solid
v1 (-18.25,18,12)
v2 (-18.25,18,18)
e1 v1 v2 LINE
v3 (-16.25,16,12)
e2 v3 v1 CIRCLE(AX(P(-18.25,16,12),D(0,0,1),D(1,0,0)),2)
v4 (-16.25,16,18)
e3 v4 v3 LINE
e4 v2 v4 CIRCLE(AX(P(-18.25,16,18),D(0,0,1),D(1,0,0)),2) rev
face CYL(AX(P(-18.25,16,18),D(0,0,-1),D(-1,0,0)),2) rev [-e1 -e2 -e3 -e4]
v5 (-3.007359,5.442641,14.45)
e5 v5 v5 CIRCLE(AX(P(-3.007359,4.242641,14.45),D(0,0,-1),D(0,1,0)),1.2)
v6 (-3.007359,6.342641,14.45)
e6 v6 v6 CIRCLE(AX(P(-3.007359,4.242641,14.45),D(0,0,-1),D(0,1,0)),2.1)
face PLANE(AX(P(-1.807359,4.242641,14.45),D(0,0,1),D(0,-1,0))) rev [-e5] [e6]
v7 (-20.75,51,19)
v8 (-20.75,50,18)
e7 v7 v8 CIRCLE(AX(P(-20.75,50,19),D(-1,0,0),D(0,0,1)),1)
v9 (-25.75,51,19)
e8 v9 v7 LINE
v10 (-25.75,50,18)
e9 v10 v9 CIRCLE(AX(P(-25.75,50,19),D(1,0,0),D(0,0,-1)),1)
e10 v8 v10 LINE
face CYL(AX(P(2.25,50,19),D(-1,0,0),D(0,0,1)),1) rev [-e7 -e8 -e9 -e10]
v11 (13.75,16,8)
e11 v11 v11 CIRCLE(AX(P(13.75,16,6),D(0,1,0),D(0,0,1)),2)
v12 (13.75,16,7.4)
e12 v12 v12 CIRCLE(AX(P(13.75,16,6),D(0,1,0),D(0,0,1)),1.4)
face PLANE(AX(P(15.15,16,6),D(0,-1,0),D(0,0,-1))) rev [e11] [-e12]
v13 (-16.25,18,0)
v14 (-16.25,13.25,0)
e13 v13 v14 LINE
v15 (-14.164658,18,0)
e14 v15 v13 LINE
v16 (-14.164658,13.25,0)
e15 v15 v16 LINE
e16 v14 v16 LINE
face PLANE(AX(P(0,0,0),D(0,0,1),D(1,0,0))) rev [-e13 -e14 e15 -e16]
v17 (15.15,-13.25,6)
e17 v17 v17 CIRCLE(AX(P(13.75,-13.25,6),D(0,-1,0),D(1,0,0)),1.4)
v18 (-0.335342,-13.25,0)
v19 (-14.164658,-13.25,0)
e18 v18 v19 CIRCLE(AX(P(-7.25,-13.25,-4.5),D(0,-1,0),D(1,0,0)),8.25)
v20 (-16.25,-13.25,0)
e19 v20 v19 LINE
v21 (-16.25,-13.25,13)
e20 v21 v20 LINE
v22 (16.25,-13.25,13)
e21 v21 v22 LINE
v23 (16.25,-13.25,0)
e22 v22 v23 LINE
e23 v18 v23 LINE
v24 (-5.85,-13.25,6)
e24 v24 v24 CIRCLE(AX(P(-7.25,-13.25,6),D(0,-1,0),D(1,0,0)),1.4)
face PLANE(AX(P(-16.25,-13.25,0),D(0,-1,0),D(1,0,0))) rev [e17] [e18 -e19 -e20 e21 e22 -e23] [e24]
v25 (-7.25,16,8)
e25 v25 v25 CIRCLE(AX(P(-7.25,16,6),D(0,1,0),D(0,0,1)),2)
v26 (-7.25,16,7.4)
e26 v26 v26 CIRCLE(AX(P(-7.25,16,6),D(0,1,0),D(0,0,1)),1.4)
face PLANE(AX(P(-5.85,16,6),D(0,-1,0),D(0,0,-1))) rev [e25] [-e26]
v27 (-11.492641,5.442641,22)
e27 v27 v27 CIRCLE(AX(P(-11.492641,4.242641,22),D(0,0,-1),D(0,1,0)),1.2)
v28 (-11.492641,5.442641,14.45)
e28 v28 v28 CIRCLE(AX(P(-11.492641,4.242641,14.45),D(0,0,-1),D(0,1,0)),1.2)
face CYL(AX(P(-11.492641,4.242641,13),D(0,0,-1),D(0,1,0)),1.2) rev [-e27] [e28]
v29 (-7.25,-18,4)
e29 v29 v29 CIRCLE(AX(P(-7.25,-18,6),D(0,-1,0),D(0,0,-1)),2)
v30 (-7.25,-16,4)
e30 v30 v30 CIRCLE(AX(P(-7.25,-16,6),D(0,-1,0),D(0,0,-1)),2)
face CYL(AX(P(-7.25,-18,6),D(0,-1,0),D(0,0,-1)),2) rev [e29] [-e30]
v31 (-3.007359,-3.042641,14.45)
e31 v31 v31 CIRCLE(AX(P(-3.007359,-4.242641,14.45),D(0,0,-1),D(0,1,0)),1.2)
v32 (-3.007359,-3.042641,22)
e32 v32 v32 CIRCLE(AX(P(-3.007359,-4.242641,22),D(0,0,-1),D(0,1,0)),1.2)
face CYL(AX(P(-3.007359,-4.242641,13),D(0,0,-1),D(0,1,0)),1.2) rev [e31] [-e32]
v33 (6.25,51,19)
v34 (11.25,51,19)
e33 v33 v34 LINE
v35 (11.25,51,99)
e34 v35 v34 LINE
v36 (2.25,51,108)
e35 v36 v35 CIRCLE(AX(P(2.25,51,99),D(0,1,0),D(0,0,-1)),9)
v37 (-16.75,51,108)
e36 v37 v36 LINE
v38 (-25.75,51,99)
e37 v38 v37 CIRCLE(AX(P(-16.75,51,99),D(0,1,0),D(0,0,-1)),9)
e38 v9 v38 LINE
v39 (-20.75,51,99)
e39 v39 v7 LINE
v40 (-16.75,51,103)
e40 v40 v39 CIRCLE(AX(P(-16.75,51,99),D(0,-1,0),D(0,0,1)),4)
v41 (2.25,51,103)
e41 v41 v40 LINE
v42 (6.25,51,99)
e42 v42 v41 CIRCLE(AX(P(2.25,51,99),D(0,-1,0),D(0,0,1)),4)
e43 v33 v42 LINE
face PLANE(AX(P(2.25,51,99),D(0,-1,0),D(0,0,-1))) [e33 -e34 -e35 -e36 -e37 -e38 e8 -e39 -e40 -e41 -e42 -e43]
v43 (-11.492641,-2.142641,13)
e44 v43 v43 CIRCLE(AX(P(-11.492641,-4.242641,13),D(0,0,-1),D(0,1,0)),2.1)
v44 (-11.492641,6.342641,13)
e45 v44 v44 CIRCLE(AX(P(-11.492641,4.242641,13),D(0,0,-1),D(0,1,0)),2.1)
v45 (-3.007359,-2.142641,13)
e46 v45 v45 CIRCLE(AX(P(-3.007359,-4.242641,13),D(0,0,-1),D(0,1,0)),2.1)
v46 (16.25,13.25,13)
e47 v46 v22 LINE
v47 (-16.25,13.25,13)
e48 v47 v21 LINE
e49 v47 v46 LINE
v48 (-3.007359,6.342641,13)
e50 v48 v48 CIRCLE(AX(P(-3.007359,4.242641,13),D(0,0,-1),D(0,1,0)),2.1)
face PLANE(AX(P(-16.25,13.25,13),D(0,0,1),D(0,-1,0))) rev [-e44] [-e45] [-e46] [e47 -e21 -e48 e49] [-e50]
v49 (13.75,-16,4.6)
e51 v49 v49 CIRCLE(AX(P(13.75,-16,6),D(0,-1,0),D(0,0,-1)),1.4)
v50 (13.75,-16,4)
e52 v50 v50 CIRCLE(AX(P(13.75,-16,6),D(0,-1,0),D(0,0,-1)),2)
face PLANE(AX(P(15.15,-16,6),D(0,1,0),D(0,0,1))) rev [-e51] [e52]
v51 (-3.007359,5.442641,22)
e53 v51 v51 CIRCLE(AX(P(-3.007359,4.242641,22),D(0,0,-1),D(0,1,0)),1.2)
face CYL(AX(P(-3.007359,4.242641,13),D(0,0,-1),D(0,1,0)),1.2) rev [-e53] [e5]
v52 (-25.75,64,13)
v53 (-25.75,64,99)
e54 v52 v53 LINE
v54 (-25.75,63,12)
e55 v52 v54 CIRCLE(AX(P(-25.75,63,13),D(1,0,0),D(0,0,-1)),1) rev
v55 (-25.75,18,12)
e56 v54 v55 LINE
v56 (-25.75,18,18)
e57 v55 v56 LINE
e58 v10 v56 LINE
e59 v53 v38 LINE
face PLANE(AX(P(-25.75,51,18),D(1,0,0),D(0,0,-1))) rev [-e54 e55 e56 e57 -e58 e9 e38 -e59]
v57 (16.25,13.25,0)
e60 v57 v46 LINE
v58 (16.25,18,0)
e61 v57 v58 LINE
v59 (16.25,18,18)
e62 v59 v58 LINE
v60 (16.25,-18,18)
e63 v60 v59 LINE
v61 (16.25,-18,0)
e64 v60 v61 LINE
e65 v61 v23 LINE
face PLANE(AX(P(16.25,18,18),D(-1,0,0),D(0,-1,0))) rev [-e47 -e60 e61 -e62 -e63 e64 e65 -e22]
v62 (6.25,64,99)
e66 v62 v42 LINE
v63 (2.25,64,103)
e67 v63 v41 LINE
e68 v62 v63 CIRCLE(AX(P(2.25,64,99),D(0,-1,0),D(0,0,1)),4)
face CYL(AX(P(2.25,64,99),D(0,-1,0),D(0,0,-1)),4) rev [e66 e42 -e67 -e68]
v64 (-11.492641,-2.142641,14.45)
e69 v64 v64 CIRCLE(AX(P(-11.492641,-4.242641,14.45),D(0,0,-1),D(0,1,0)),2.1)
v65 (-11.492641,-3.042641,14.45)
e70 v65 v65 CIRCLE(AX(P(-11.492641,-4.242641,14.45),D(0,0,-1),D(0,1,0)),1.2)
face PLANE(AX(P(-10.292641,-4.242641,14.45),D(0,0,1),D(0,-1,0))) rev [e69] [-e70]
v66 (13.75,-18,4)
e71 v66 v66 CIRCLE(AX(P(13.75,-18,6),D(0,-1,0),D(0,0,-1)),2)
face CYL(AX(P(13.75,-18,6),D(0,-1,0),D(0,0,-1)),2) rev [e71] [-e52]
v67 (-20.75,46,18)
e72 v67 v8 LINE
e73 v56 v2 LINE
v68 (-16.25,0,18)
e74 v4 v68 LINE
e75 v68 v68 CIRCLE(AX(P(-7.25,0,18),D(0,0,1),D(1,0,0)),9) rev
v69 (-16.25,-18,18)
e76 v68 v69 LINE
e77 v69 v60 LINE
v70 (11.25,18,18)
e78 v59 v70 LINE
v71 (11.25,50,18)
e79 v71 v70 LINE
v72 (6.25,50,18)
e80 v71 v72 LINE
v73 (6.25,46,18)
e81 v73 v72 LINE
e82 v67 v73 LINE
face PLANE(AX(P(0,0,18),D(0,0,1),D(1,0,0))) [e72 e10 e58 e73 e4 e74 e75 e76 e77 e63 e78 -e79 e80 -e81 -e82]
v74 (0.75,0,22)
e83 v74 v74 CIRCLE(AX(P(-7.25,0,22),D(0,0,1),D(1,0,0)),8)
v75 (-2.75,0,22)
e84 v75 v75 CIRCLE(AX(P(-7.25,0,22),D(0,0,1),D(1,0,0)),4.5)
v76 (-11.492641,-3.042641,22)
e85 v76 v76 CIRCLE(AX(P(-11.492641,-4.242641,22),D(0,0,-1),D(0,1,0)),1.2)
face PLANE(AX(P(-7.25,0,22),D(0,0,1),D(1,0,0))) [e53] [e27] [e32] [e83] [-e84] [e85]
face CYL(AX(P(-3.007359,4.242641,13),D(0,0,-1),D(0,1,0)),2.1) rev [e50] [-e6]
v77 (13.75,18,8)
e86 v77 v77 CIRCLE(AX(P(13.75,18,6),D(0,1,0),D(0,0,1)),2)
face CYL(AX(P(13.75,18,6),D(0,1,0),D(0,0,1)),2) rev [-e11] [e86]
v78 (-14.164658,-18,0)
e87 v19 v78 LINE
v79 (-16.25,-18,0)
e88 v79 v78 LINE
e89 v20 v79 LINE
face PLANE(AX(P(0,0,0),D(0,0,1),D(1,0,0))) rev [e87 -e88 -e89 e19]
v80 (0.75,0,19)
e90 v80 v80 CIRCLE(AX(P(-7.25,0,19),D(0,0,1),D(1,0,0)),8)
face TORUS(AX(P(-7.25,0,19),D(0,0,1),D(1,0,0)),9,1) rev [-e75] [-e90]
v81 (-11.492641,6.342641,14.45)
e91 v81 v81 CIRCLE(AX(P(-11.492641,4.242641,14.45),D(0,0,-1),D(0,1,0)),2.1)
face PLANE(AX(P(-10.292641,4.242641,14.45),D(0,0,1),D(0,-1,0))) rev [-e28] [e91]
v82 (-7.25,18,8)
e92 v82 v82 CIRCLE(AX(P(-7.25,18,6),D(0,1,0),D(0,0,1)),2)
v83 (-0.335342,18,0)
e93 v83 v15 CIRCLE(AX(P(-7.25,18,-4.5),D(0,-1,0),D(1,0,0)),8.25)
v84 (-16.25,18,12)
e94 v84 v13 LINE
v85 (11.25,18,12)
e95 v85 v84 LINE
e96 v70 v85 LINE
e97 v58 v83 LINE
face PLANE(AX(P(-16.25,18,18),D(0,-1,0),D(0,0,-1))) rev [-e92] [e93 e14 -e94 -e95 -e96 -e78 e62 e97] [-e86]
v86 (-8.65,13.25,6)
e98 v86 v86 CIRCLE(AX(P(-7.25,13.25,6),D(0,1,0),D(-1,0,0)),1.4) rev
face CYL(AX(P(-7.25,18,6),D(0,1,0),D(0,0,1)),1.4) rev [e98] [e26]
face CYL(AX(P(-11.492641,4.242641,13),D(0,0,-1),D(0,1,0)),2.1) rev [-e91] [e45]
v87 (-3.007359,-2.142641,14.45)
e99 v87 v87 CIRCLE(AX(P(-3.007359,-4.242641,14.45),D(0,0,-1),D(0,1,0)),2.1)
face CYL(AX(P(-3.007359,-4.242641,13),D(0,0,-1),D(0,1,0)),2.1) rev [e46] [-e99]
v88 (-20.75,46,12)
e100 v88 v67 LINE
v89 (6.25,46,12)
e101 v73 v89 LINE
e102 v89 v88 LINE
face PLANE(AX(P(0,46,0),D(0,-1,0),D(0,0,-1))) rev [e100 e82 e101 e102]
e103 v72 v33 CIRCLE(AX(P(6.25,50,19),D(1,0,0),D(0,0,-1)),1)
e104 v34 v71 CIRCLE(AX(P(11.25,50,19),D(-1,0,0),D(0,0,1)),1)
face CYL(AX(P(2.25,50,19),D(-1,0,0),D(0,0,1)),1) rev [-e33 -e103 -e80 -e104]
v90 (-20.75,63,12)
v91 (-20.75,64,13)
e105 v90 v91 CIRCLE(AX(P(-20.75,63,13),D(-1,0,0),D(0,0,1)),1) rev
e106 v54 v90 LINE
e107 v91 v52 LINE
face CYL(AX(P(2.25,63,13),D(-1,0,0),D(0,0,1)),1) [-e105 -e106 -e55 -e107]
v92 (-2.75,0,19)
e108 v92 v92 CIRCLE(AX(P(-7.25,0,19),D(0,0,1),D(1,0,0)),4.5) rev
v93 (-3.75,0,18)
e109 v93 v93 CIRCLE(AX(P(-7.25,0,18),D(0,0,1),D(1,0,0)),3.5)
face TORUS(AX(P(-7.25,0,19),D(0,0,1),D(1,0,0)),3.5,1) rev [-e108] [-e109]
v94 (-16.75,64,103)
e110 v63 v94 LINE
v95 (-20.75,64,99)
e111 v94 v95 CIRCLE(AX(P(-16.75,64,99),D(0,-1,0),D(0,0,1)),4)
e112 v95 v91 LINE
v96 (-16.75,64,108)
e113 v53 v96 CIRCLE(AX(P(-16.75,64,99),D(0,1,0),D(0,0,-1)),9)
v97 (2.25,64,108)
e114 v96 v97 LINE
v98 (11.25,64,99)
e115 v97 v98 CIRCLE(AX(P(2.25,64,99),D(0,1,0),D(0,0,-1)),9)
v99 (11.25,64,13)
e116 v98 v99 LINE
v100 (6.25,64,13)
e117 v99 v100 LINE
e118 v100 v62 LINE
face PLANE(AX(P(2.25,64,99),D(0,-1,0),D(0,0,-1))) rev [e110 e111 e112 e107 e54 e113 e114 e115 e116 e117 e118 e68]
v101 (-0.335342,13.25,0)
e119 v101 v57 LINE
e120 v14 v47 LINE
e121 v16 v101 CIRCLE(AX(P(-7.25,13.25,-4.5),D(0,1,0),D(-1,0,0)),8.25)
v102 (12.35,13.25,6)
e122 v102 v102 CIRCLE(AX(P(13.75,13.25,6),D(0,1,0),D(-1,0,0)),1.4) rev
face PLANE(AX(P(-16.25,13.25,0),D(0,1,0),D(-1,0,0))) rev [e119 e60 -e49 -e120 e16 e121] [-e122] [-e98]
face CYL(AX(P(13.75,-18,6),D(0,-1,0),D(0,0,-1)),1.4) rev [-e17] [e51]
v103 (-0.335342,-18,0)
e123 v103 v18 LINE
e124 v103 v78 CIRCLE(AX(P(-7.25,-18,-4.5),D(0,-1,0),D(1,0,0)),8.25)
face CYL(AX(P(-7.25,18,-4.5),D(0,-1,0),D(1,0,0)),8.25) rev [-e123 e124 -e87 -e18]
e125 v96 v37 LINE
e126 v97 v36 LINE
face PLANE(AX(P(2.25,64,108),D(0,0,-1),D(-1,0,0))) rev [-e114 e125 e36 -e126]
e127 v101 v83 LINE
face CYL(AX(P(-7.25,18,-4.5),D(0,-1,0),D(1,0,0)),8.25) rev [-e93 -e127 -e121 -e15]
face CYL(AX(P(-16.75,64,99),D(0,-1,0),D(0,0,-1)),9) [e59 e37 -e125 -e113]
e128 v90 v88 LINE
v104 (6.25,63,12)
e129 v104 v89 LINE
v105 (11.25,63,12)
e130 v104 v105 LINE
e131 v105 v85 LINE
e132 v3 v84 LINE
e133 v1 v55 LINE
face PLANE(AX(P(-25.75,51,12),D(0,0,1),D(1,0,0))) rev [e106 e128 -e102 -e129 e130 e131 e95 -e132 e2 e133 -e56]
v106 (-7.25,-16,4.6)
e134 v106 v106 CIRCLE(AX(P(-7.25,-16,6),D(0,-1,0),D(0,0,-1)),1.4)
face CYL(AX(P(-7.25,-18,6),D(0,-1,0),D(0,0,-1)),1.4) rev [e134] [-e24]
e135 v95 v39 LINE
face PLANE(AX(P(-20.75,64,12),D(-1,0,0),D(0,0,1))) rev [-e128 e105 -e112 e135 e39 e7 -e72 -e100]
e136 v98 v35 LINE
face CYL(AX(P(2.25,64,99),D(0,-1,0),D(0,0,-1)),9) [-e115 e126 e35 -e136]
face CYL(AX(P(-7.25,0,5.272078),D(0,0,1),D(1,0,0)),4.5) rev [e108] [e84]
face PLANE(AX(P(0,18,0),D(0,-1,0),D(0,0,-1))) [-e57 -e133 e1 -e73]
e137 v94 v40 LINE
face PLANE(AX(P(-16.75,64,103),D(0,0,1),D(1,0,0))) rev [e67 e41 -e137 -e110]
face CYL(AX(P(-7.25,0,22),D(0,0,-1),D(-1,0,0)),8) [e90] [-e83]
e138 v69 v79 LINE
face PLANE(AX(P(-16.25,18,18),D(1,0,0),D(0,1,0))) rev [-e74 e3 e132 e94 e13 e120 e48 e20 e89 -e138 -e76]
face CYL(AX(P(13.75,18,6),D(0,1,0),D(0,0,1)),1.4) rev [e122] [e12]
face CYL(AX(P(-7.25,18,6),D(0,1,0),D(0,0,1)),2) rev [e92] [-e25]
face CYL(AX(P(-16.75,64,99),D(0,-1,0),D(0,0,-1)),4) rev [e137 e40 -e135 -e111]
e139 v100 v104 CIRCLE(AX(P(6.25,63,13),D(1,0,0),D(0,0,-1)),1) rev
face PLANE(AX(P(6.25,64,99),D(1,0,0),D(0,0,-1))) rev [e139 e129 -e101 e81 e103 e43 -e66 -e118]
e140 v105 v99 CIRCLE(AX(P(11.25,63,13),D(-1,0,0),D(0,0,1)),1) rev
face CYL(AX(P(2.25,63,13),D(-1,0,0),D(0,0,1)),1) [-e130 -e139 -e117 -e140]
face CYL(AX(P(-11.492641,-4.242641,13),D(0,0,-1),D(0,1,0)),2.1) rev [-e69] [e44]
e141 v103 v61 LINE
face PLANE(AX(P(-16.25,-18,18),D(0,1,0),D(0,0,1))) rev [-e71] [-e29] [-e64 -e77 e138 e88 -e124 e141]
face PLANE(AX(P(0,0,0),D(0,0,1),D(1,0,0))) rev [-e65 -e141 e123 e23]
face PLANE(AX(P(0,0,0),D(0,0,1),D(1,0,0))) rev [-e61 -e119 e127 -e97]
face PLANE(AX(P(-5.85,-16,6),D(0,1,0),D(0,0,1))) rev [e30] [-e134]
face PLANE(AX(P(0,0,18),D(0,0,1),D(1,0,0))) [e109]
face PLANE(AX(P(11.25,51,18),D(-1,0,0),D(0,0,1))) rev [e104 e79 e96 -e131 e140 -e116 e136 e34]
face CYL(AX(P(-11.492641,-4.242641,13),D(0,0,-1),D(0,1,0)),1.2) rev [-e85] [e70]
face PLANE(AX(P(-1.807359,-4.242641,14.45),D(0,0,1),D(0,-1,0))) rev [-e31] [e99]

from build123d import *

# Parameters (mm, degrees)
SKETCH_1_W                   = 32.5
SKETCH_1_H                   = 36
EXTRUDE_1_DEPTH              = 18
SKETCH_2_W                   = 13
SKETCH_2_H                   = 26.5
CUT_EXTRUDE_1_DEPTH          = 42.282562905
HOLE_WIZARD_M2_3_AT_2_COUNT  = 2
HOLE_WIZARD_M2_3_AT_2_PITCH  = 21
CUT_EXTRUDE_3_DEPTH          = 40.555340979
CUT_EXTRUDE_3_DEPTH_BACK     = 40.555340979
SKETCH_4_R                   = 8.25
SKETCH_4_R_2                 = 1.2
SKETCH_18_R                  = 8
EXTRUDE_4_DEPTH              = 4
HOLE_WIZARD_M2_2_D           = 2.4
HOLE_WIZARD_M2_2_CBORE_D     = 4.2
HOLE_WIZARD_M2_2_CBORE_DEPTH = 1.45
SKETCH_19_R                  = 4.5
CUT_EXTRUDE_9_DEPTH          = 4
SKETCH_13_W                  = 37
SKETCH_13_H                  = 6
EXTRUDE_3_DEPTH              = 33
EXTRUDE_5_DEPTH              = 13
FILLET_1_R                   = 1
FILLET_2_R                   = 1
FILLET_3_R                   = 2
FILLET_4_R                   = 1
SKETCH_21_W                  = 27
SKETCH_21_H                  = 6
CUT_EXTRUDE_10_DEPTH         = 5


with BuildPart() as part:
    # ｽｹｯﾁ1 → ﾎﾞｽ - 押し出し1 (new body)
    with BuildSketch(Plane.XY):
        Rectangle(SKETCH_1_W, SKETCH_1_H)
    extrude(amount=EXTRUDE_1_DEPTH)

    # ｽｹｯﾁ2 → ｶｯﾄ - 押し出し1 (cut, through all)
    with BuildSketch(Plane(origin=(16.25, 0, 0), x_dir=(0, 0, -1), z_dir=(1, 0, 0))):
        with Locations((-6.5, 0)):
            Rectangle(SKETCH_2_W, SKETCH_2_H)
    extrude(amount=-CUT_EXTRUDE_1_DEPTH, mode=Mode.SUBTRACT)

    # ｽｹｯﾁ6 → M2 丸平ねじ用座ぐり穴3 (revolve, cut)
    with BuildSketch(Plane(origin=(13.75, 18, 6), x_dir=(0, 0, 1), z_dir=(1, 0, 0))):
        Polygon((0, 0), (0, 5.591204867), (1.4, 4.75), (1.4, 2), (2, 2), (2, 0), align=None)
    hole_wizard_m2_3 = revolve(axis=Axis((13.75, 24.35, 6), (0, -1, 0)), mode=Mode.SUBTRACT)

    # M2 丸平ねじ用座ぐり穴3 at 2: M2 丸平ねじ用座ぐり穴3 ×2
    with Locations(*[(-i * HOLE_WIZARD_M2_3_AT_2_PITCH, 0, 0) for i in range(1, HOLE_WIZARD_M2_3_AT_2_COUNT)]):
        add(hole_wizard_m2_3, mode=Mode.SUBTRACT)

    # ﾐﾗｰ1: M2 丸平ねじ用座ぐり穴3 across plane
    add(hole_wizard_m2_3.mirror(Plane.ZX), mode=Mode.SUBTRACT)

    # ﾐﾗｰ1 copy 1 sketch → ﾐﾗｰ1 copy 1 (revolve, cut)
    with BuildSketch(Plane(origin=(-7.25, -18, 6), x_dir=(0, 0, 1), z_dir=(1, 0, 0))):
        Polygon((0, 0), (0, -5.591204867), (1.4, -4.75), (1.4, -2), (2, -2), (2, 0), align=None)
    revolve(axis=Axis((-7.25, -24.35, 6), (0, -1, 0)), mode=Mode.SUBTRACT)

    # ｽｹｯﾁ4 → ｶｯﾄ - 押し出し3 (cut, two sides: drawn at the far end of the back side and taken through both)
    with BuildSketch(Plane.XZ.offset(-13.25).offset(-CUT_EXTRUDE_3_DEPTH_BACK)):
        with Locations((-7.25, -4.5)):
            Circle(SKETCH_4_R)
        with Locations((-7.25, 6)):
            Circle(SKETCH_4_R_2)
    extrude(amount=CUT_EXTRUDE_3_DEPTH + CUT_EXTRUDE_3_DEPTH_BACK, mode=Mode.SUBTRACT)

    # ｽｹｯﾁ18 → ﾎﾞｽ - 押し出し4 (add)
    with BuildSketch(Plane.XY.offset(18)):
        with Locations((-7.25, 0)):
            Circle(SKETCH_18_R)
    extrude(amount=EXTRUDE_4_DEPTH)

    # M2 丸平ねじ用座ぐり穴2 (through all)
    with Locations(Plane(origin=(0, 0, 13), x_dir=(-1, 0, 0), z_dir=(0, 0, -1))):
        with Locations((11.492640687, 4.242640687), (3.007359313, -4.242640687), (11.492640687, -4.242640687), (3.007359313, 4.242640687)):
            CounterBoreHole(HOLE_WIZARD_M2_2_D / 2, HOLE_WIZARD_M2_2_CBORE_D / 2, HOLE_WIZARD_M2_2_CBORE_DEPTH)

    # ｽｹｯﾁ19 → ｶｯﾄ - 押し出し9 (cut)
    with BuildSketch(Plane.XY.offset(22)):
        with Locations((-7.25, 0)):
            Circle(SKETCH_19_R)
    extrude(amount=-CUT_EXTRUDE_9_DEPTH, mode=Mode.SUBTRACT)

    # ｽｹｯﾁ13 → ﾎﾞｽ - 押し出し3 (add)
    with BuildSketch(Plane(origin=(0, 18, 0), x_dir=(1, 0, 0), z_dir=(0, 1, 0))):
        with Locations((-7.25, -15)):
            Rectangle(SKETCH_13_W, SKETCH_13_H)
    extrude(amount=EXTRUDE_3_DEPTH)

    # ｽｹｯﾁ20 → ﾎﾞｽ - 押し出し5 (add)
    with BuildSketch(Plane(origin=(0, 51, 0), x_dir=(1, 0, 0), z_dir=(0, 1, 0))):
        with BuildLine():
            Line((11.25, -12), (11.25, -99))
            ThreePointArc((11.25, -99), (8.613961031, -105.363961031), (2.25, -108))
            Line((2.25, -108), (-16.75, -108))
            ThreePointArc((-16.75, -108), (-23.113961031, -105.363961031), (-25.75, -99))
            Line((-25.75, -99), (-25.75, -12))
            Line((-25.75, -12), (-20.75, -12))
            Line((-20.75, -12), (-20.75, -99))
            ThreePointArc((-20.75, -99), (-19.578427125, -101.828427125), (-16.75, -103))
            Line((-16.75, -103), (2.25, -103))
            ThreePointArc((2.25, -103), (5.078427125, -101.828427125), (6.25, -99))
            Line((6.25, -99), (6.25, -12))
            Line((6.25, -12), (11.25, -12))
        make_face()
    extrude(amount=EXTRUDE_5_DEPTH)

    # ﾌｨﾚｯﾄ1
    fillet_1_edges = [part.edges().sort_by_distance(p)[0] for p in [
        (-23.25, 51, 18),
        (8.75, 51, 18),
    ]]
    fillet(fillet_1_edges, radius=FILLET_1_R)

    # ﾌｨﾚｯﾄ2
    fillet_2_edges = [part.edges().sort_by_distance(p)[0] for p in [
        (8.75, 64, 12),
        (-23.25, 64, 12),
    ]]
    fillet(fillet_2_edges, radius=FILLET_2_R)

    # ﾌｨﾚｯﾄ3
    fillet_3_edges = [part.edges().sort_by_distance(p)[0] for p in [
        (-16.25, 18, 15),
    ]]
    fillet(fillet_3_edges, radius=FILLET_3_R)

    # ﾌｨﾚｯﾄ4
    fillet_4_edges = [part.edges().sort_by_distance(p)[0] for p in [
        (-11.75, 0, 18),
        (-15.25, 0, 18),
    ]]
    fillet(fillet_4_edges, radius=FILLET_4_R - 0.0001)  # a hair under: the kernel refuses the full size

    # ｽｹｯﾁ21 → ｶｯﾄ - 押し出し10 (cut)
    with BuildSketch(Plane(origin=(0, 51, 0), x_dir=(1, 0, 0), z_dir=(0, 1, 0))):
        with Locations((-7.25, -15)):
            Rectangle(SKETCH_21_W, SKETCH_21_H)
    extrude(amount=-CUT_EXTRUDE_10_DEPTH, mode=Mode.SUBTRACT)


solid = part.part
